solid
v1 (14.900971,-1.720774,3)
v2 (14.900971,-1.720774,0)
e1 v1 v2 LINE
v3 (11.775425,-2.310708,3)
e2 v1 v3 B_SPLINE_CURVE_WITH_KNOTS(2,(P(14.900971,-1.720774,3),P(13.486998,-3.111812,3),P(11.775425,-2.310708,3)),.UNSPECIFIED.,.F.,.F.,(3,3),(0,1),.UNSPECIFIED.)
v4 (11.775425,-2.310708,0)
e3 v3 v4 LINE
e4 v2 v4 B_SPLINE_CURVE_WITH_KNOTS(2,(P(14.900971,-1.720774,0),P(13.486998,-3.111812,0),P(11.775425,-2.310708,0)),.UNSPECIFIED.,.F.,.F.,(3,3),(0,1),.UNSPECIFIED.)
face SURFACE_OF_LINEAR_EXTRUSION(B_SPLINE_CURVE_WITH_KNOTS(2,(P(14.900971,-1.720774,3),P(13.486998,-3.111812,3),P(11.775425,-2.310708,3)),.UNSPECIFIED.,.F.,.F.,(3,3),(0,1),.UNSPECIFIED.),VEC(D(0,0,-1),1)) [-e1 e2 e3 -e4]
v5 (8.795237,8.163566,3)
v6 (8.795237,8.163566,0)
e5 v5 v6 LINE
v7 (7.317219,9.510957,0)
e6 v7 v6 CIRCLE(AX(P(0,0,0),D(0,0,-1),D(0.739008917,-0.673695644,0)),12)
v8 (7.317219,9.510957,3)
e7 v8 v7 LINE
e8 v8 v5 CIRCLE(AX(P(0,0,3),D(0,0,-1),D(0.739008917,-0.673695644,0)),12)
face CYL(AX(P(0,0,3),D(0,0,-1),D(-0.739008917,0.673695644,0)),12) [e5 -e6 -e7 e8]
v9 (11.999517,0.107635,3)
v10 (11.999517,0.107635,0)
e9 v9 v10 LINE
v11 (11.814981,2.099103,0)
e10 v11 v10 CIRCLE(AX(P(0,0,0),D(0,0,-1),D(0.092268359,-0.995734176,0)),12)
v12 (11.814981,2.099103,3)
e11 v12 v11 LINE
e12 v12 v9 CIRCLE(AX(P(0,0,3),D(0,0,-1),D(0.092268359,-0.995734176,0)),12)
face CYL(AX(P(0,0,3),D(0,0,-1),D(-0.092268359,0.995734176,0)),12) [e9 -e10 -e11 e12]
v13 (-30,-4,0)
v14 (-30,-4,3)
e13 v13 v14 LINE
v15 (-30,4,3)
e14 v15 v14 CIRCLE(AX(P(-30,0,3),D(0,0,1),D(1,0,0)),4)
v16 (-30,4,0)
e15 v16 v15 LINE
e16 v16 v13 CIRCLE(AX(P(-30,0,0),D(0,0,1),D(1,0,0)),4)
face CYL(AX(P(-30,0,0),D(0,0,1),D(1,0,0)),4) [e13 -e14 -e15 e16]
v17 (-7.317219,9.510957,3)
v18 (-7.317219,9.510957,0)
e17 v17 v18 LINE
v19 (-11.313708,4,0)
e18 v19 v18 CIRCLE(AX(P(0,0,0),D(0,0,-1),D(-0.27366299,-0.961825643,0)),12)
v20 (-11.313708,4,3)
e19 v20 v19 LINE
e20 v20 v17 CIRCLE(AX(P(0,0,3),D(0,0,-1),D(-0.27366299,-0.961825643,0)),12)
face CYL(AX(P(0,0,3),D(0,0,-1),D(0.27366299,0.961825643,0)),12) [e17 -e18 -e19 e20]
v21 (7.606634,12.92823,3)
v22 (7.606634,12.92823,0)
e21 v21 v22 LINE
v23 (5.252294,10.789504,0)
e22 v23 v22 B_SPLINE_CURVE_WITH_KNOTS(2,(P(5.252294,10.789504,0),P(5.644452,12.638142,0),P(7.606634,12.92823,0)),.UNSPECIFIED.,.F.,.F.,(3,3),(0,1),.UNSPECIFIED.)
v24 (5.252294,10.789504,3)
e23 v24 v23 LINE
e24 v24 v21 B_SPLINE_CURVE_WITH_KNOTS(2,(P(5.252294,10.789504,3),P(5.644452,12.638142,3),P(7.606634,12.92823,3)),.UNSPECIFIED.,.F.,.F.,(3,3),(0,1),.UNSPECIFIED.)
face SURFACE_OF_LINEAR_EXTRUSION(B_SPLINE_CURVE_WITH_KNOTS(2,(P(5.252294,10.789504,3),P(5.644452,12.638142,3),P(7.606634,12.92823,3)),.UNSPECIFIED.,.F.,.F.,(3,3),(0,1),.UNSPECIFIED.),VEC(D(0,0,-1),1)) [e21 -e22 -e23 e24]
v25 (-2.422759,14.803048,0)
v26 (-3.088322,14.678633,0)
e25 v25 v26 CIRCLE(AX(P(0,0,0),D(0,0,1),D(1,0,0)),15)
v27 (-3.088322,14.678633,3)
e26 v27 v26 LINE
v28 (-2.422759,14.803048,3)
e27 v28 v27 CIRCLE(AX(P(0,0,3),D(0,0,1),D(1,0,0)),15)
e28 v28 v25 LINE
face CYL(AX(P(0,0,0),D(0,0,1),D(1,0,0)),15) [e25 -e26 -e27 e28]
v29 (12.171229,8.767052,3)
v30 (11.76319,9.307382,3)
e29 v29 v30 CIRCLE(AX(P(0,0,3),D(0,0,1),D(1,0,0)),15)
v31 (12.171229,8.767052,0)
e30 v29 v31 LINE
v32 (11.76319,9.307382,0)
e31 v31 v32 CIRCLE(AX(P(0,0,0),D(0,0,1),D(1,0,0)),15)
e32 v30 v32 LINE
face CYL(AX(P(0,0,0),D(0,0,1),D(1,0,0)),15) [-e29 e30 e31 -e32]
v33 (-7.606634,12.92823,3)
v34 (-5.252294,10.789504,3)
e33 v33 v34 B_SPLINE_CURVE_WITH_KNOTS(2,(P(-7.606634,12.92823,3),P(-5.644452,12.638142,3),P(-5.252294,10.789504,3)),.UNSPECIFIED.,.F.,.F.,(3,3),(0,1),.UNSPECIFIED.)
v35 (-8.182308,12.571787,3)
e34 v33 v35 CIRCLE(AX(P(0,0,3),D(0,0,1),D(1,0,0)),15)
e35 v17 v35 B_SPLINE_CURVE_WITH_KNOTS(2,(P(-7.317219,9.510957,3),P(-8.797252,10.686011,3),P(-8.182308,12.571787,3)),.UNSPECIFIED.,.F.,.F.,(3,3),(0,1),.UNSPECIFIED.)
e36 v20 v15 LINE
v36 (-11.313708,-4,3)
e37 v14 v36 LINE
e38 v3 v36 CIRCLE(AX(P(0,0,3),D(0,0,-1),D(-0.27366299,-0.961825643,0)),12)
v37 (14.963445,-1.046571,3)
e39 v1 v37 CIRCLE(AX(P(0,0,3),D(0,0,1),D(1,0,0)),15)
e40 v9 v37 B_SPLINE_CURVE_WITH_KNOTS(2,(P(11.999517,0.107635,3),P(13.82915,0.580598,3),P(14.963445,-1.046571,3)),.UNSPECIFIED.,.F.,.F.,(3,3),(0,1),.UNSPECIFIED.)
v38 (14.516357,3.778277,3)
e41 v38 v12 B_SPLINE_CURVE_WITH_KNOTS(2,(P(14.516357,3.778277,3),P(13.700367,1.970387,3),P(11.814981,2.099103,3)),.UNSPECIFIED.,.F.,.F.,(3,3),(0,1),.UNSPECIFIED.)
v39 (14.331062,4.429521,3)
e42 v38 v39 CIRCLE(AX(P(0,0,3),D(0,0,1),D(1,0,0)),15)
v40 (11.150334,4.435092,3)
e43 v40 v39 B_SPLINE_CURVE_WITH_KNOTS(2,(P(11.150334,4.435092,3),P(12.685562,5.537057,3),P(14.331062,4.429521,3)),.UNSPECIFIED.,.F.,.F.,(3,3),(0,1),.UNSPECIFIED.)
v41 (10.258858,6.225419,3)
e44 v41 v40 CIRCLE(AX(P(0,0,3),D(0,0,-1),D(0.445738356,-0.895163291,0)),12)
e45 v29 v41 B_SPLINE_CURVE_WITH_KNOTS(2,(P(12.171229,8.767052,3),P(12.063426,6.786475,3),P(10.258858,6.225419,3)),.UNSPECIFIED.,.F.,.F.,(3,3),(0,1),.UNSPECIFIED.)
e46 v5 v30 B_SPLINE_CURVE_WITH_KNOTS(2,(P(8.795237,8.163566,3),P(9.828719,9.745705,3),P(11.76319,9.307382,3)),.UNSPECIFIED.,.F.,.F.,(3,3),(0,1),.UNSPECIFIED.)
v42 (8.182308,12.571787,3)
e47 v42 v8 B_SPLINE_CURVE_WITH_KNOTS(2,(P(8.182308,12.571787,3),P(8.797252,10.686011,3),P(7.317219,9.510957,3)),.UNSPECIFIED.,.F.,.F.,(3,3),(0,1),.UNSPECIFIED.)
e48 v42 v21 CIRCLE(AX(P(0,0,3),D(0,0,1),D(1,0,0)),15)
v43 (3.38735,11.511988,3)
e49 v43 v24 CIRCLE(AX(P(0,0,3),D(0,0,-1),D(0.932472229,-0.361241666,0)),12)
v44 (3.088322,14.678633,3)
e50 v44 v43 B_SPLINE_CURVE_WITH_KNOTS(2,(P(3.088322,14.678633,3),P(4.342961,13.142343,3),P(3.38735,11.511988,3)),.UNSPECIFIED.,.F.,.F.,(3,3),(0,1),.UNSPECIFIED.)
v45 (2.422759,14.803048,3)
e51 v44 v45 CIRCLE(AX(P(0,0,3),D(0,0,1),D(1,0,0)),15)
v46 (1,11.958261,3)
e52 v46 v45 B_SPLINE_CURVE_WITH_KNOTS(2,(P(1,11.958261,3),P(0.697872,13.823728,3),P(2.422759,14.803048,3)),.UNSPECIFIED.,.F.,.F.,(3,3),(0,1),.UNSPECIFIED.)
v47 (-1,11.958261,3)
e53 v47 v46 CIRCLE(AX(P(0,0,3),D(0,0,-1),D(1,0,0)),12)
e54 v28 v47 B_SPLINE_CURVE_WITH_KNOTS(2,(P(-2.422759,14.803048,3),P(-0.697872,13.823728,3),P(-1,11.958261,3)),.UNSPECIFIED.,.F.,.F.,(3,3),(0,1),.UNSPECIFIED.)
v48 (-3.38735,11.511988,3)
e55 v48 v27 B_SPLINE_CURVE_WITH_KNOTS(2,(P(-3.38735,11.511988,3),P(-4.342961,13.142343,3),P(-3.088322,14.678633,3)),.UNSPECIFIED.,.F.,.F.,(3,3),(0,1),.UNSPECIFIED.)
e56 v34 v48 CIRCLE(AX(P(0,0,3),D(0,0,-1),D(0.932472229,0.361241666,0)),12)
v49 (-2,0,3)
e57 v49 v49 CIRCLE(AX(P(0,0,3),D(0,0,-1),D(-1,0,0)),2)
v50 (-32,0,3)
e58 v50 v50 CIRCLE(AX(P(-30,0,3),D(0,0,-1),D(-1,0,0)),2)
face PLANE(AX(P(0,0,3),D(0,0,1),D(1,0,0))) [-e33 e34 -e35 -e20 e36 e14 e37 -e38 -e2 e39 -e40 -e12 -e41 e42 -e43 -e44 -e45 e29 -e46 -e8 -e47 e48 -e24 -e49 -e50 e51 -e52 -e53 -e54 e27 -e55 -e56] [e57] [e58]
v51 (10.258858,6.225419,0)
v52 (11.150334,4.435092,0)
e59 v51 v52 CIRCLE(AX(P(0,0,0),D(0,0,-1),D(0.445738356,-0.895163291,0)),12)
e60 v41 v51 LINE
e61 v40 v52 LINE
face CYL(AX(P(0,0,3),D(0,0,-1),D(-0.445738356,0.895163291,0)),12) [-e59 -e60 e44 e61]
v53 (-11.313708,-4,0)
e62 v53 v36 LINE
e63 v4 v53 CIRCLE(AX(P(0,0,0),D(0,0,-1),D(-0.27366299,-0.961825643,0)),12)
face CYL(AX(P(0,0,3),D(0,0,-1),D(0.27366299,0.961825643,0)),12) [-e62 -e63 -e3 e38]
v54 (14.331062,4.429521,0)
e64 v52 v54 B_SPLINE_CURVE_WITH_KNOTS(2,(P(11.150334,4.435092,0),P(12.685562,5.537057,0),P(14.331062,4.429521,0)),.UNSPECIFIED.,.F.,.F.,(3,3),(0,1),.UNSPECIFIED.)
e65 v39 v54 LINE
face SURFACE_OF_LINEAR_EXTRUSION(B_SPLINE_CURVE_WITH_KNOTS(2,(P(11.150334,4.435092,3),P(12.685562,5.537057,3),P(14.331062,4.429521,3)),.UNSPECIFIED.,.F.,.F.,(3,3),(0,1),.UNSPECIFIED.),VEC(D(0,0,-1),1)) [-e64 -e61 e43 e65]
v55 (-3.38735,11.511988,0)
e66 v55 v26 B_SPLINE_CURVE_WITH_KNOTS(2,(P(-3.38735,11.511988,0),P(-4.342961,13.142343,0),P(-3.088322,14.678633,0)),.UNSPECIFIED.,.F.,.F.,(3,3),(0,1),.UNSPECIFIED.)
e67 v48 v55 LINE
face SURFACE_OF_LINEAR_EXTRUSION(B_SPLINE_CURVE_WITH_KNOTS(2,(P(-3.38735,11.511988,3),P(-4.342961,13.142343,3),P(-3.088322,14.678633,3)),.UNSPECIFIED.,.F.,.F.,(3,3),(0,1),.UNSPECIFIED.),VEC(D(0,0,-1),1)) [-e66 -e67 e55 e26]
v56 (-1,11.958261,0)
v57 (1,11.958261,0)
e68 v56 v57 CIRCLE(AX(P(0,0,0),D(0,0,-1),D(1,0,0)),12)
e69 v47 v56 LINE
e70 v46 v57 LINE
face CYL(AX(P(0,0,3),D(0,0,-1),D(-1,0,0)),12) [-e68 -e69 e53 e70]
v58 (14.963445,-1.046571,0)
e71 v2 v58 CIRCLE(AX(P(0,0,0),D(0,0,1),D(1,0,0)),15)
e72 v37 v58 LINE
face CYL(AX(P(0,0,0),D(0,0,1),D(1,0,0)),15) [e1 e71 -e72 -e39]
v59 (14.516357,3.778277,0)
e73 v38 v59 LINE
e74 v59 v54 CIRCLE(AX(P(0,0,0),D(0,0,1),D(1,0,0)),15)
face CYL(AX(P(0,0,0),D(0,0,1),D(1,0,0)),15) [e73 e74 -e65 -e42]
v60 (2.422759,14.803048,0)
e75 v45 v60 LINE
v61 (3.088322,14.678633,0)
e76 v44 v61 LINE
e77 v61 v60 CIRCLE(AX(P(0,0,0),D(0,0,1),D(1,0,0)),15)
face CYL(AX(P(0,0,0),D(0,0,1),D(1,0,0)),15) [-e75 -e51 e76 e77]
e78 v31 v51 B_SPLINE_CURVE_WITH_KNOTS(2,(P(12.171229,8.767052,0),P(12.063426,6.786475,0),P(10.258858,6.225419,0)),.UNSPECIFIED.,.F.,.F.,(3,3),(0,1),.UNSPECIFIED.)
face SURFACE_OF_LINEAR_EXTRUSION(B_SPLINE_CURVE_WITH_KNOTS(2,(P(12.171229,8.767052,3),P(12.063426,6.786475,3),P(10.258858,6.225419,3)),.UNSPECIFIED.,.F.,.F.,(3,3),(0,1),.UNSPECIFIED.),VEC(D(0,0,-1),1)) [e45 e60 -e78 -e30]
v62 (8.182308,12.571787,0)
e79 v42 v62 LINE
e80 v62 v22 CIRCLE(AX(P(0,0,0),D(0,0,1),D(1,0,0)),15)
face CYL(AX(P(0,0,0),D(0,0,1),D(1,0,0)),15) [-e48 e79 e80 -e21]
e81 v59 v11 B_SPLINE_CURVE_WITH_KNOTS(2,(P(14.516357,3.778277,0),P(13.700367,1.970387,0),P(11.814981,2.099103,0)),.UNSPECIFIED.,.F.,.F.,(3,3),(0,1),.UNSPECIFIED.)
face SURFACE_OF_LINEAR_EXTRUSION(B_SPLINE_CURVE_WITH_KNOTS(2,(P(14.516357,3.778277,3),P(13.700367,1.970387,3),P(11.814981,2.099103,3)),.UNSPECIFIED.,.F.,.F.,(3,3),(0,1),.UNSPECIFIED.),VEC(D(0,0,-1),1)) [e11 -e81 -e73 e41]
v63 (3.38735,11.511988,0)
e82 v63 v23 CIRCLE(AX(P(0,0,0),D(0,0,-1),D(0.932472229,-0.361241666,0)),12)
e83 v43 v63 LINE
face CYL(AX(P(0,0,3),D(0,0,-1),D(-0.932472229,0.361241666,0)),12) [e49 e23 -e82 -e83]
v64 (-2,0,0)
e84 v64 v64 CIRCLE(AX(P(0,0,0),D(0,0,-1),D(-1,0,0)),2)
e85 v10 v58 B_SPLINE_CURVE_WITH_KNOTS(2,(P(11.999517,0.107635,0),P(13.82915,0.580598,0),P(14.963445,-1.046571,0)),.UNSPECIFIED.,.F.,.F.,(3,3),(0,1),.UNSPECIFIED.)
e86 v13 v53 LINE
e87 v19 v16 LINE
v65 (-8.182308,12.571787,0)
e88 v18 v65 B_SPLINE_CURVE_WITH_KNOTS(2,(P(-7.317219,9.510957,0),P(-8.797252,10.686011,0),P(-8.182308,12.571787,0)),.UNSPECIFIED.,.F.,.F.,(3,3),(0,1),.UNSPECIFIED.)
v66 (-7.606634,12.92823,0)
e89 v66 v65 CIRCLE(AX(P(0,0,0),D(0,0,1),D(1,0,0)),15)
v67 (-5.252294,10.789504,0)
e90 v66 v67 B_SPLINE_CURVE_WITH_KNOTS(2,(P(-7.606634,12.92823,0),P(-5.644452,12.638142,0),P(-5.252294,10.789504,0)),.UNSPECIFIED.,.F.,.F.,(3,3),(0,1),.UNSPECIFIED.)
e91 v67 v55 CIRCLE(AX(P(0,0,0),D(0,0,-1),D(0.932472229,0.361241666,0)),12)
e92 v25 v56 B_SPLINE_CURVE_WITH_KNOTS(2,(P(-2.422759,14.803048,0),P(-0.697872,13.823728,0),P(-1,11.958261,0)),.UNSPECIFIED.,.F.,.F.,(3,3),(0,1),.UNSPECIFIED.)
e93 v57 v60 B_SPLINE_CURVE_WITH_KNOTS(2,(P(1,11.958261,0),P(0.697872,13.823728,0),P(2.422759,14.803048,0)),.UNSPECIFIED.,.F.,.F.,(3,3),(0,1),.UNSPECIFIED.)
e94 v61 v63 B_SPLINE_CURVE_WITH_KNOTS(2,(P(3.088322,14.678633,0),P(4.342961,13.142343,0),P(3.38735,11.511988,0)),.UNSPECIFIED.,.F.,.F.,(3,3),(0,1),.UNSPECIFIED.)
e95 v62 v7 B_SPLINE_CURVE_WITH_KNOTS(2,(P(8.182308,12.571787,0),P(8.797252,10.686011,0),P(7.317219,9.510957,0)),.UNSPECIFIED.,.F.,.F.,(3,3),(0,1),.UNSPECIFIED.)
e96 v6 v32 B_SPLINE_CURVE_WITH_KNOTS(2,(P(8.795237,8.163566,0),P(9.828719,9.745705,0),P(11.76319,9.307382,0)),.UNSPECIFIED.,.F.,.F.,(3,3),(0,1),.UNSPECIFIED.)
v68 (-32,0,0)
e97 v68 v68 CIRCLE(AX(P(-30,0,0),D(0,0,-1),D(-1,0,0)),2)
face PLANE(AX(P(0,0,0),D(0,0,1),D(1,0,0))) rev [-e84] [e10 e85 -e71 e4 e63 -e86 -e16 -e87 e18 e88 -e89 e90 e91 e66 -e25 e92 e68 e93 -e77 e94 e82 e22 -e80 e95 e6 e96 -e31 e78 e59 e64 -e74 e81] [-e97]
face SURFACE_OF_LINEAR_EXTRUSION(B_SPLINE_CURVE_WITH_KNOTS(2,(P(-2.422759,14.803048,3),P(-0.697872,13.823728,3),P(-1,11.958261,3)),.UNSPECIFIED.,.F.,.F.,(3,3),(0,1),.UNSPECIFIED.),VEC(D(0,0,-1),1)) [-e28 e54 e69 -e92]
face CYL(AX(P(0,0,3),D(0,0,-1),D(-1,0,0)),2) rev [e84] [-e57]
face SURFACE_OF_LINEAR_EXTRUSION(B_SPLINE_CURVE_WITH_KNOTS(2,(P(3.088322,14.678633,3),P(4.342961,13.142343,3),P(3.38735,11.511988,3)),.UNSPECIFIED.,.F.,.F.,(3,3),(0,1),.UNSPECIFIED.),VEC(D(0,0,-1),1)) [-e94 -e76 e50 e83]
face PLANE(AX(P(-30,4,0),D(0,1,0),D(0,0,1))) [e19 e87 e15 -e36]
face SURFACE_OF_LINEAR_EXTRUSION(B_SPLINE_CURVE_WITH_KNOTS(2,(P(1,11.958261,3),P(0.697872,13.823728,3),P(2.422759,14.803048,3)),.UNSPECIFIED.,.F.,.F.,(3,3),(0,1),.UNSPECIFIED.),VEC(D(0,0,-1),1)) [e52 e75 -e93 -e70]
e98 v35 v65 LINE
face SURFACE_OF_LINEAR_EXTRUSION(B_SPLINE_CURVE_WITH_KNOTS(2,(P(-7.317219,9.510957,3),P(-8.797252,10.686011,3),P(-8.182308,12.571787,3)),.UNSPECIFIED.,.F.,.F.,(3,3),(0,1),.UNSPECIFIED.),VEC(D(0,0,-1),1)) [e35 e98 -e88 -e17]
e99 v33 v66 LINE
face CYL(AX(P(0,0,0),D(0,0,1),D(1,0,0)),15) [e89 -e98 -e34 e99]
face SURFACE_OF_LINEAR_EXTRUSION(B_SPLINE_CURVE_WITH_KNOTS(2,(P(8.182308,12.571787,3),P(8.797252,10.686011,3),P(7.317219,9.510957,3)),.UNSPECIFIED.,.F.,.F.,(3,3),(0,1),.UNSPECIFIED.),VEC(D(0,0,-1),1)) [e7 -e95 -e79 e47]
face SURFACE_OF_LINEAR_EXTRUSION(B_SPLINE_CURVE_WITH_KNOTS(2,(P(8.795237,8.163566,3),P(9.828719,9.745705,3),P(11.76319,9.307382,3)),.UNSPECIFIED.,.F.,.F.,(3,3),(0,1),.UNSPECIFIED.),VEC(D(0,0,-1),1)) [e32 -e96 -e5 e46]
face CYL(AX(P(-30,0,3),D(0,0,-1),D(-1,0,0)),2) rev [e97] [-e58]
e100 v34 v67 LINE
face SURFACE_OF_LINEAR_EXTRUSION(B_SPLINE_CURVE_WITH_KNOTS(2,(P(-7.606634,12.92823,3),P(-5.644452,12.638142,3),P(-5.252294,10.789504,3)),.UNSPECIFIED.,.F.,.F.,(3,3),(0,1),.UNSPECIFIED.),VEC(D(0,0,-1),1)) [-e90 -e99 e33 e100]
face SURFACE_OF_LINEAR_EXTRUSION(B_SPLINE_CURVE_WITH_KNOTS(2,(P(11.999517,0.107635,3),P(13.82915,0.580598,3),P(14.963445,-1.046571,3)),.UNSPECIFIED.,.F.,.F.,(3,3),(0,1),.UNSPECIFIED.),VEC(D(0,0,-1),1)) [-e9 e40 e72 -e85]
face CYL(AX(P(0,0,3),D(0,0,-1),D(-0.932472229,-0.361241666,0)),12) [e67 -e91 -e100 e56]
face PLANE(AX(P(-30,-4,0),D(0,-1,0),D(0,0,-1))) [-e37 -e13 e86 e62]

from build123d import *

# Parameters (mm, degrees)
EXTRUDE_1_OUTLINE_R      = 19
EXTRUDE_1_DEPTH          = 3
CUT_EXTRUDE_1_DEPTH      = 28.037011669
CUT_EXTRUDE_START        = -3
SKETCH_5_R               = 19
SKETCH_5_R_2             = 15
CUT_EXTRUDE_2_DEPTH      = 3
PATTERN_CIRCULAR_1_COUNT = 17
CUT_EXTRUDE_4_DEPTH      = 3
EXTRUDE_3_DEPTH          = 3
SKETCH_7_R               = 2
CUT_EXTRUDE_3_DEPTH      = 3


# Read off the part's stored shape, not the designer's step: 凸台-拉伸1
with BuildPart() as part:
    # 凸台-拉伸1 outline → 凸台-拉伸1 (new body)
    with BuildSketch(Plane.XY):
        Circle(EXTRUDE_1_OUTLINE_R)
    extrude(amount=EXTRUDE_1_DEPTH)

    # 草图2 → 切除-拉伸1 (cut, through all)
    with BuildSketch(Plane.XY):
        with BuildLine():
            ThreePointArc((1, 11.958260743), (0, 12), (-1, 11.958260743))
            add(Edge.make_bspline(
                [(-1, 11.958260743), (-0.697871553, 13.823728022), (-2.422759286, 14.803048248)],
                knots=[0, 0, 0, 1, 1, 1], degree=2))
            ThreePointArc((-2.422759286, 14.803048248), (0, 15), (2.422759286, 14.803048248))
            add(Edge.make_bspline(
                [(1, 11.958260743), (0.697871553, 13.823728022), (2.422759286, 14.803048248)],
                knots=[0, 0, 0, 1, 1, 1], degree=2))
        make_face()
    cut_extrude_1 = extrude(amount=CUT_EXTRUDE_1_DEPTH, mode=Mode.SUBTRACT)

    # 草图5 → 切除-拉伸2 (cut)
    with BuildSketch(Plane.XY.offset(3).offset(CUT_EXTRUDE_START)):
        Circle(SKETCH_5_R)
        Circle(SKETCH_5_R_2, mode=Mode.SUBTRACT)
    extrude(amount=CUT_EXTRUDE_2_DEPTH, mode=Mode.SUBTRACT)

    # 阵列(圆周)1: 切除-拉伸1 ×17 about axis
    pattern_circular_1_axis = Axis((0, 0, 3), (0, 0, -1))
    for i in range(1, PATTERN_CIRCULAR_1_COUNT):
        add(cut_extrude_1.rotate(pattern_circular_1_axis, i * 360 / PATTERN_CIRCULAR_1_COUNT), mode=Mode.SUBTRACT)

    # 草图8 → 切除-拉伸4 (cut)
    with BuildSketch(Plane(origin=(0, 0, 0), x_dir=(-1, 0, 0), z_dir=(0, 0, -1))):
        with BuildLine():
            Line((10.120821448, 11.071087264), (8.096657158, 8.856869812))
            ThreePointArc((8.096657158, 8.856869812), (6.278516295, -10.226447728), (-11.561990246, -3.212535065))
            Line((-11.561990246, -3.212535065), (-13.925196787, -5.575741606))
            ThreePointArc((-13.925196787, -5.575741606), (8.538005961, -12.332982373), (10.120821448, 11.071087264))
        make_face()
    extrude(amount=-CUT_EXTRUDE_4_DEPTH, mode=Mode.SUBTRACT)

    # 草图6 → 凸台-拉伸3 (add)
    with BuildSketch(Plane.XY.offset(3)):
        with BuildLine():
            Line((-30, 4), (0, 4))
            Line((0, 4), (0, -4))
            Line((0, -4), (-30, -4))
            ThreePointArc((-30, -4), (-34, 0), (-30, 4))
        make_face()
    extrude(amount=-EXTRUDE_3_DEPTH)

    # 草图7 → 切除-拉伸3 (cut)
    with BuildSketch(Plane(origin=(0, 0, 0), x_dir=(-1, 0, 0), z_dir=(0, 0, -1))):
        Circle(SKETCH_7_R)
        with Locations((30, 0)):
            Circle(SKETCH_7_R)
    extrude(amount=-CUT_EXTRUDE_3_DEPTH, mode=Mode.SUBTRACT)


solid = part.part
